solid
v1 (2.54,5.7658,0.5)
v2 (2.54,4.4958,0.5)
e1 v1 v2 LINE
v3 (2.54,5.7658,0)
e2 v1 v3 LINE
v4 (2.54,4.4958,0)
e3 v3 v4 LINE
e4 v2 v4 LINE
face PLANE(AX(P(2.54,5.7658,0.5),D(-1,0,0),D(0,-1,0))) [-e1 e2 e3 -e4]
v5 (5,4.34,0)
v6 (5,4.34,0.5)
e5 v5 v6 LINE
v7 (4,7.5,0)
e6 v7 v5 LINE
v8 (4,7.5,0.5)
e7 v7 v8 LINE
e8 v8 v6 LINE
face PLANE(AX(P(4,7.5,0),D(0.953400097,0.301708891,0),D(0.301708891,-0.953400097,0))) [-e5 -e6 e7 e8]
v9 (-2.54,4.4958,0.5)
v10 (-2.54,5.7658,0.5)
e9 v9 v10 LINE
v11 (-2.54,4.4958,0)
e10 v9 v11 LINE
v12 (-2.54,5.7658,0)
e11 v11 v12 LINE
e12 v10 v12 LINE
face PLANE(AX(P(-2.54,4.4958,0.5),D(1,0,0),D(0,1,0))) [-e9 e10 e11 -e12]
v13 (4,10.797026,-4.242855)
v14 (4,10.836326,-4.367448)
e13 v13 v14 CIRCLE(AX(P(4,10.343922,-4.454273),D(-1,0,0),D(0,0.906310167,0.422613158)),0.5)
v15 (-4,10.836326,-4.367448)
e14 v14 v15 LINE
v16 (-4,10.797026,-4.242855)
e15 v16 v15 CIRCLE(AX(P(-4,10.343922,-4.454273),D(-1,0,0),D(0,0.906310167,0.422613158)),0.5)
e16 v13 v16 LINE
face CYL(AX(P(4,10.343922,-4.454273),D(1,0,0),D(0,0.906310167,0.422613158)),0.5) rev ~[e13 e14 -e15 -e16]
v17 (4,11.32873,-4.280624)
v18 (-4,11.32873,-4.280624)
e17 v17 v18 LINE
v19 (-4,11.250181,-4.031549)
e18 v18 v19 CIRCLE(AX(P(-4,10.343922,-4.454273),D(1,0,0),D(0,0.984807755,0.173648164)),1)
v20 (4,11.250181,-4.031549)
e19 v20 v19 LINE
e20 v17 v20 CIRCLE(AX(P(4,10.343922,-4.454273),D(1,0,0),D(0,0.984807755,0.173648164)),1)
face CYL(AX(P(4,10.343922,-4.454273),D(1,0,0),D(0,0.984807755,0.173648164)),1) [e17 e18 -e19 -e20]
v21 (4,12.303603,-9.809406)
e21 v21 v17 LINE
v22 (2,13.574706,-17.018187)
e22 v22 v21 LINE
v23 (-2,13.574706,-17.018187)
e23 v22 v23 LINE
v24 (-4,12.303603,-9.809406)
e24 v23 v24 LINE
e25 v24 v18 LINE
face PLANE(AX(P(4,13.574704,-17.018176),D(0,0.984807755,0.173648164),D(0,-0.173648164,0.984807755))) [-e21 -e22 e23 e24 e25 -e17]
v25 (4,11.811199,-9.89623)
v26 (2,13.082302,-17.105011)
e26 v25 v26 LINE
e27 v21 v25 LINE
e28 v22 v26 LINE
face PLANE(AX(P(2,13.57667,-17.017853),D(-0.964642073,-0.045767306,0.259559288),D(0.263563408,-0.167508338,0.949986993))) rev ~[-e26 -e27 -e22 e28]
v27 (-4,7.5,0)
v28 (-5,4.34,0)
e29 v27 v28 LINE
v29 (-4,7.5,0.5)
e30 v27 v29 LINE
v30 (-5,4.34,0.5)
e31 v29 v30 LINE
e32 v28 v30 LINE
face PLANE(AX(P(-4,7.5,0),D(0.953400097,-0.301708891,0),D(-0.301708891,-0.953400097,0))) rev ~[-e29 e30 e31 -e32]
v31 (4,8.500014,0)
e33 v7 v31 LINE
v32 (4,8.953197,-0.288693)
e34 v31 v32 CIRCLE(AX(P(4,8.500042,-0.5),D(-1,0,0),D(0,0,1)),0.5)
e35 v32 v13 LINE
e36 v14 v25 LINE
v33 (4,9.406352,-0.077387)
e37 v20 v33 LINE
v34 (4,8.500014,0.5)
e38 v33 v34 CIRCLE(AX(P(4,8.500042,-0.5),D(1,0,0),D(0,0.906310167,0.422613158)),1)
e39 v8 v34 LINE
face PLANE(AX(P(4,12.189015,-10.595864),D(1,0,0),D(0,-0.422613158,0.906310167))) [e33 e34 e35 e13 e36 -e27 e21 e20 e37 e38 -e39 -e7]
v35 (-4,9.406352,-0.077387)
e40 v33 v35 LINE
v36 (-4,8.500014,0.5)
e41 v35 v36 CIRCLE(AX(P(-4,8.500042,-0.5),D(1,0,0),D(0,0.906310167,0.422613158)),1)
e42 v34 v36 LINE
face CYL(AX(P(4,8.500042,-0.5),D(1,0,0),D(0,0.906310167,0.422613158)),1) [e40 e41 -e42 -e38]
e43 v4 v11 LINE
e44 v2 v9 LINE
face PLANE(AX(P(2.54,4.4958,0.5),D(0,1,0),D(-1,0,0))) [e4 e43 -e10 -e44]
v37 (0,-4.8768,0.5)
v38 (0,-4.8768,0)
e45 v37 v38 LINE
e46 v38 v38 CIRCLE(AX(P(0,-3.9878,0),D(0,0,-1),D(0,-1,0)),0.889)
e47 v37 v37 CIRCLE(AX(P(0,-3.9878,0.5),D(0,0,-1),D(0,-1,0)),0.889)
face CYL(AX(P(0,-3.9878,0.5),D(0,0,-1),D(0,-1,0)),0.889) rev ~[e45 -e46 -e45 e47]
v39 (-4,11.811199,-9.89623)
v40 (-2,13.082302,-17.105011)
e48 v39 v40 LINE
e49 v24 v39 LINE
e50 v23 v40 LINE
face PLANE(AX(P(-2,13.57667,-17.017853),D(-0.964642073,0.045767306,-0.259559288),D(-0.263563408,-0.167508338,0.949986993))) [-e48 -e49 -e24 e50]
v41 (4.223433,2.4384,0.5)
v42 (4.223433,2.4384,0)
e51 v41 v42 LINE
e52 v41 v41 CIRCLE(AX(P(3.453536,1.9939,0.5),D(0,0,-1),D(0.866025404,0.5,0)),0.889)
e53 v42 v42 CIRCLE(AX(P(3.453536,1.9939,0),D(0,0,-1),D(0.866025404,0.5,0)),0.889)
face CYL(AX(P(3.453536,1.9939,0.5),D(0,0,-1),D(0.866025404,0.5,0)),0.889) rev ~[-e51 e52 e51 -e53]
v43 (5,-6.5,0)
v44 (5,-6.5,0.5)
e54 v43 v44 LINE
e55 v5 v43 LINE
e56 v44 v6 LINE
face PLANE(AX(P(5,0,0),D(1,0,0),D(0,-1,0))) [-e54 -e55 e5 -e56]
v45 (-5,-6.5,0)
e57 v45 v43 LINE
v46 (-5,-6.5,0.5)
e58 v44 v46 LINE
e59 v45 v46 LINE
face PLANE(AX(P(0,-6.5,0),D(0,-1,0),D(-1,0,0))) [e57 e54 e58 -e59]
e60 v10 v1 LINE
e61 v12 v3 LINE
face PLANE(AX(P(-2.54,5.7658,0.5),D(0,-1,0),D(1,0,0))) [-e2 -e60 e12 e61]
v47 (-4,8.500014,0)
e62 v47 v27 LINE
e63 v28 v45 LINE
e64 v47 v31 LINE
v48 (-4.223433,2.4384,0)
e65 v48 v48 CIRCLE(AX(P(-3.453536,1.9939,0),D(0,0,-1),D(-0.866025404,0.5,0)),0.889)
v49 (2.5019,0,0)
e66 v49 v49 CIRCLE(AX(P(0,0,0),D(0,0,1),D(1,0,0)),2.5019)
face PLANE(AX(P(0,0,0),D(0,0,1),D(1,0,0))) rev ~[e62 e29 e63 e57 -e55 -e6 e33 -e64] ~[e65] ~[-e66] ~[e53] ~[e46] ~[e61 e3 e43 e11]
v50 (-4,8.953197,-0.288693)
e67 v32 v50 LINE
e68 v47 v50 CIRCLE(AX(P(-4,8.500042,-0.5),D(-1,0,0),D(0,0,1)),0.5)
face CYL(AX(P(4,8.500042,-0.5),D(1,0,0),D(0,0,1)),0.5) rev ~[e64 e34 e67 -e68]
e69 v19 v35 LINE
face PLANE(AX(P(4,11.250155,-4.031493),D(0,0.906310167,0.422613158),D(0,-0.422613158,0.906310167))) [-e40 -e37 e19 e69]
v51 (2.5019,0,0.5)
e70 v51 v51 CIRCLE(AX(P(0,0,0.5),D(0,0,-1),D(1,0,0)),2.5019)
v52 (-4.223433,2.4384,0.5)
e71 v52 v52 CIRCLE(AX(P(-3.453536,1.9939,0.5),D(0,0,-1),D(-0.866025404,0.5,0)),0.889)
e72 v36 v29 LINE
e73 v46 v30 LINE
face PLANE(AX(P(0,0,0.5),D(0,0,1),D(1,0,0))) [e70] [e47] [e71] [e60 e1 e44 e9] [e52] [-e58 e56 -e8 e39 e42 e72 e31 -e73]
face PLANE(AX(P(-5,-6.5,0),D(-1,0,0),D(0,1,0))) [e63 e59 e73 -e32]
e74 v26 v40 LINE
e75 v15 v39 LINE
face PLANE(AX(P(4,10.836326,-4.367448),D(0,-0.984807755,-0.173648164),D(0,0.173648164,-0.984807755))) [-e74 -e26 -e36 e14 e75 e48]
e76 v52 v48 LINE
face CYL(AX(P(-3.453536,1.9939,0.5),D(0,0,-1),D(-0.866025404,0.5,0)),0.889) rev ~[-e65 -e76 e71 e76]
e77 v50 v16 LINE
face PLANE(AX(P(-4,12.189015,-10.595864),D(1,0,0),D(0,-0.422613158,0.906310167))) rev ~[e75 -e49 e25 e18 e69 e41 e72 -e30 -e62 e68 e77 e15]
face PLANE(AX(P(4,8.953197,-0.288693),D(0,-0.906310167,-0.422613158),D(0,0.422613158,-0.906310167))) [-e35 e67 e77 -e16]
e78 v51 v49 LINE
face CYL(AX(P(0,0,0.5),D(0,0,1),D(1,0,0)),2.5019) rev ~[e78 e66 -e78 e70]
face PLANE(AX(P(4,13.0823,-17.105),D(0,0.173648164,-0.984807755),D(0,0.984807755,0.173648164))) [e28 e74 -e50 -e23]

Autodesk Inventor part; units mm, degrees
ref_plane "YZ Plane" through (0, 0, 0) normal (1, 0, 0) x (0, 1, 0)
ref_plane "XZ Plane" through (0, 0, 0) normal (0, 1, 0) x (-1, 0, 0)
ref_plane "XY Plane" through (0, 0, 0) normal (0, 0, 1) x (1, 0, 0)
sketch "Sketch1" plane through (0, 0, 0) normal (0, 0, 1) x (1, 0, 0)
  line L0 (0, -9.5) -> (0, 11.5)
  line L1 (-4, 7.5) -> (4, 7.5)
  line L2 (4, 7.5) -> (4, 2.1599)
  line L3 (4, 2.1599) -> (-4, 2.1599)
  line L4 (-4, 2.1599) -> (-4, 7.5)
  line L5 (-7, 0) -> (7, 0)
  line L6 (-4, 7.5) -> (-5, 4.34)
  line L7 (4, 7.5) -> (5, 4.34)
  line L8 (-4, 4.34) -> (4, 4.34)
  line L9 (-5, -6.5) -> (-5, 4.34)
  line L10 (5, 4.34) -> (5, -6.5)
  line L11 (5, -6.5) -> (-5, -6.5)
  line L12 (-4, 7.5) -> (4, 7.5)
  line L13 (4, 7.5) -> (4, 8.5)
  line L14 (4, 8.5) -> (-4, 8.5)
  line L15 (-4, 8.5) -> (-4, 7.5)
  point P0 (0, 7.5)
  point P1 (0, 0)
  dimension "d6" = 8
  dimension "d9" = 10.84
  dimension "d40" = 7.5
  dimension "d41" = 8.5
extrude "Plate1" add sketch "Sketch1" along normal blind 0.5
sketch "Sketch2" plane through (0, 0, 0.5) normal (0, 0, 1) x (1, 0, 0)
  circle A0 centre (0, 0) radius 2.5019
  line L0 (0, -9.5) -> (0, 11.5) projected
  point P0 (0, -3.9878)
  dimension "d12" = 5.0038
  dimension "d69" = 3.9878
extrude "Cut1" cut sketch "Sketch2" against normal blind 0.5
hole "Hole1" at (0, -3.9878, 0.5) direction (0, 0, -1) diameter 1.778 end through all clearance for "Flat Head Machine Screw (82)" size "#0" standard "Ansi Unified Screw Threads"
pattern_circular "Circular Pattern1" count 3 over 360 about axis through (0, 0, -10) along (0, 0, 1) of "Hole1"
sketch "Sketch3" plane through (0, 0, 0.5) normal (0, 0, 1) x (1, 0, 0)
  circle A0 centre (0, 0) radius 2.5019 projected
  line L0 (-2.5, 5.334) -> (2.5, 5.334)
  line L1 (2.5, 5.334) -> (2.5, 4.572)
  line L2 (2.5, 4.572) -> (-2.5, 4.572)
  line L3 (-2.5, 4.572) -> (-2.5, 5.334)
  point P0 (0, 5.334)
  dimension "d25" = 5
  dimension "d26" = 0.762
  dimension "d27" = 5.334
cut "Cut2" [suppressed]
sketch "Sketch5" plane through (4, 8.9532, -0.2887) normal (0, 0.9063078, 0.4226183) x (-1, 0, 0)
  line L0 (8, 0) -> (0, 0)
  line L1 (0, 0) -> (0, -4.3629)
  line L2 (0, -4.3629) -> (8, -4.3629)
  line L3 (8, -4.3629) -> (8, 0)
edge flange "Flange2" height 5 angle 65 thickness 0.5 bend radius 0.5 thickness toward (0, 0.9063078, 0.4226183) relief tear relief width 0.5 relief depth 0.25 edges at (0, 8.5, 0) wall of the first edge with corners at (-4, 8.9532, -0.2887) (4, 8.9532, -0.2887) (4, 10.797, -4.2428) (-4, 10.797, -4.2428)
bend "Bend2"
corner "Corner2"
sketch "Sketch6" plane through (-4, 10.8363, -4.3673) normal (0, 0.9848078, 0.1736482) x (1, 0, 0)
  line L0 (8, 0) -> (0, 0)
  line L1 (0, 0) -> (0, -12.9342)
  line L2 (0, -12.9342) -> (8, -12.9342)
  line L3 (8, -12.9342) -> (8, 0)
edge flange "Flange3" height 13 angle -15 thickness 0.5 bend radius 0.5 thickness toward (0, 0.9848078, 0.1736482) relief tear relief width 0.5 relief depth 0.25 edges at (0, 11.2502, -4.0315) wall of the first edge with corners at (4, 10.8363, -4.3673) (-4, 10.8363, -4.3673) (-4, 13.0823, -17.105) (4, 13.0823, -17.105)
bend "Bend3"
corner "Corner3"
sketch "Sketch8" plane through (-4, 13.5747, -17.0182) normal (0, 0.9848078, 0.1736482) x (1, 0, 0)
  line L0 (0, -12.9342) -> (8, -12.9342) projected
  line L1 (8, -12.9342) -> (8, 0) projected
  line L2 (8, 0) -> (0, 0) projected
  line L3 (0, -12.9342) -> (0, 0) projected
  line L4 (2, 0) -> (6, 0)
  line L5 (6, 0) -> (6, -10.36)
  line L6 (6, -10.36) -> (2, -10.36)
  line L7 (2, -10.36) -> (2, 0)
  line L8 (4, 5.07) -> (4, -29.8212) projected
  line L9 (2, 0) -> (0, -7.32)
  line L10 (6, 0) -> (8, -7.32)
  line L11 (0, -7.32) -> (0, 0)
  line L12 (2, 0) -> (0, 0)
  line L13 (6, 0) -> (8, 0)
  line L14 (8, -7.32) -> (8, 0)
  point P0 (4, -19.1169)
  point P1 (4, 0)
  point P2 (4, 0)
  dimension "d63" = 4
  dimension "d64" = 7.32
  dimension "d65" = 12.9342
extrude "Cut3" cut sketch "Sketch8" against normal blind 0.5 contours L3 L2 L9 | L10 L2 L1
sketch "Sketch9" plane through (5, -6.5, 0) normal (1, 0, 0) x (0, 0, -1)
  line L0 (-0.5, 10.84) -> (-0.5, 0) projected
  line L1 (0, 0) -> (-0.5, 0) projected
  line L2 (0, 0) -> (0, 10.84) projected
  line L3 (0, 10.84) -> (-0.5, 10.84) projected
  line L4 (0.0774, 15.9063) -> (0.2887, 15.4532) projected
  arc A0 (0.0774, 15.9063) -> (-0.5, 15) centre (0.5, 15) ccw projected
  line L5 (0, 15) -> (-0.5, 15) projected
  arc A1 (0.2887, 15.4532) -> (0, 15) centre (0.5, 15) ccw projected
  line L6 (0, 14) -> (0, 15) projected
  line L7 (4.2805, 17.8287) -> (4.3673, 17.3363) projected
  arc A2 (4.2805, 17.8287) -> (4.0315, 17.7502) centre (4.4542, 16.8439) ccw projected
  line L8 (4.2428, 17.297) -> (4.0315, 17.7502) projected
  arc A3 (4.3673, 17.3363) -> (4.2428, 17.297) centre (4.4542, 16.8439) ccw projected
  line L9 (-0.5, 15) -> (15.0848, 17.748)
  line L10 (0.0774, 15.9063) -> (4.0315, 17.7502)
  point P0 (0, 6.5)
sketch "Sketch10" plane through (0, 0, 0.5) normal (0, 0, 1) x (1, 0, 0)
  circle A0 centre (0, 0) radius 2.5019 projected
  line L0 (-2.54, 5.7658) -> (2.54, 5.7658)
  line L1 (2.54, 5.7658) -> (2.54, 4.4958)
  line L2 (2.54, 4.4958) -> (-2.54, 4.4958)
  line L3 (-2.54, 4.4958) -> (-2.54, 5.7658)
  point P0 (0, 5.7658)
  dimension "d70" = 1.27
  dimension "d71" = 5.08
  dimension "d72" = 4.4958
extrude "Cut4" cut sketch "Sketch10" against normal blind 0.5 contours L0 L1 L2 L3
equation "\"d13\" = Thickness"
equation "\"d20\" = Thickness"
equation "\"d28\" = Thickness"
equation "\"d66\" = Thickness"
equation "\"d73\" = Thickness"
equation "\"d42\" = BendReliefWidth"
equation "\"d43\" = BendReliefDepth"
equation "\"d44\" = MinimumRemnant"
equation "\"d45\" = BendRadius"
equation "\"d48\" = BendRadius"
equation "\"d49\" = CornerReliefSize"
equation "\"d50\" = GapSize"
equation "\"d51\" = JacobiRadiusSize"
equation "\"d52\" = BendReliefWidth"
equation "\"d53\" = BendReliefDepth"
equation "\"d54\" = MinimumRemnant"
equation "\"d55\" = BendRadius"
equation "\"d58\" = BendRadius"
equation "\"d59\" = CornerReliefSize"
equation "\"d60\" = GapSize"
equation "\"d61\" = JacobiRadiusSize"
equation "\"BendRadius\" = Thickness"
equation "\"BendReliefWidth\" = Thickness"
equation "\"BendReliefDepth\" = 0.5 * Thickness"
equation "\"CornerReliefSize\" = 4 * Thickness"
equation "\"MinimumRemnant\" = 2 * Thickness"
equation "\"TransitionRadius\" = BendRadius"
equation "\"JacobiRadiusSize\" = BendRadius"
equation "\"GapSize\" = Thickness"
equation "\"d10\" = BendRadius"
equation "\"Thickness\" = 0.5"
properties part number "ASAP_Top_Fixture_New(o)"
